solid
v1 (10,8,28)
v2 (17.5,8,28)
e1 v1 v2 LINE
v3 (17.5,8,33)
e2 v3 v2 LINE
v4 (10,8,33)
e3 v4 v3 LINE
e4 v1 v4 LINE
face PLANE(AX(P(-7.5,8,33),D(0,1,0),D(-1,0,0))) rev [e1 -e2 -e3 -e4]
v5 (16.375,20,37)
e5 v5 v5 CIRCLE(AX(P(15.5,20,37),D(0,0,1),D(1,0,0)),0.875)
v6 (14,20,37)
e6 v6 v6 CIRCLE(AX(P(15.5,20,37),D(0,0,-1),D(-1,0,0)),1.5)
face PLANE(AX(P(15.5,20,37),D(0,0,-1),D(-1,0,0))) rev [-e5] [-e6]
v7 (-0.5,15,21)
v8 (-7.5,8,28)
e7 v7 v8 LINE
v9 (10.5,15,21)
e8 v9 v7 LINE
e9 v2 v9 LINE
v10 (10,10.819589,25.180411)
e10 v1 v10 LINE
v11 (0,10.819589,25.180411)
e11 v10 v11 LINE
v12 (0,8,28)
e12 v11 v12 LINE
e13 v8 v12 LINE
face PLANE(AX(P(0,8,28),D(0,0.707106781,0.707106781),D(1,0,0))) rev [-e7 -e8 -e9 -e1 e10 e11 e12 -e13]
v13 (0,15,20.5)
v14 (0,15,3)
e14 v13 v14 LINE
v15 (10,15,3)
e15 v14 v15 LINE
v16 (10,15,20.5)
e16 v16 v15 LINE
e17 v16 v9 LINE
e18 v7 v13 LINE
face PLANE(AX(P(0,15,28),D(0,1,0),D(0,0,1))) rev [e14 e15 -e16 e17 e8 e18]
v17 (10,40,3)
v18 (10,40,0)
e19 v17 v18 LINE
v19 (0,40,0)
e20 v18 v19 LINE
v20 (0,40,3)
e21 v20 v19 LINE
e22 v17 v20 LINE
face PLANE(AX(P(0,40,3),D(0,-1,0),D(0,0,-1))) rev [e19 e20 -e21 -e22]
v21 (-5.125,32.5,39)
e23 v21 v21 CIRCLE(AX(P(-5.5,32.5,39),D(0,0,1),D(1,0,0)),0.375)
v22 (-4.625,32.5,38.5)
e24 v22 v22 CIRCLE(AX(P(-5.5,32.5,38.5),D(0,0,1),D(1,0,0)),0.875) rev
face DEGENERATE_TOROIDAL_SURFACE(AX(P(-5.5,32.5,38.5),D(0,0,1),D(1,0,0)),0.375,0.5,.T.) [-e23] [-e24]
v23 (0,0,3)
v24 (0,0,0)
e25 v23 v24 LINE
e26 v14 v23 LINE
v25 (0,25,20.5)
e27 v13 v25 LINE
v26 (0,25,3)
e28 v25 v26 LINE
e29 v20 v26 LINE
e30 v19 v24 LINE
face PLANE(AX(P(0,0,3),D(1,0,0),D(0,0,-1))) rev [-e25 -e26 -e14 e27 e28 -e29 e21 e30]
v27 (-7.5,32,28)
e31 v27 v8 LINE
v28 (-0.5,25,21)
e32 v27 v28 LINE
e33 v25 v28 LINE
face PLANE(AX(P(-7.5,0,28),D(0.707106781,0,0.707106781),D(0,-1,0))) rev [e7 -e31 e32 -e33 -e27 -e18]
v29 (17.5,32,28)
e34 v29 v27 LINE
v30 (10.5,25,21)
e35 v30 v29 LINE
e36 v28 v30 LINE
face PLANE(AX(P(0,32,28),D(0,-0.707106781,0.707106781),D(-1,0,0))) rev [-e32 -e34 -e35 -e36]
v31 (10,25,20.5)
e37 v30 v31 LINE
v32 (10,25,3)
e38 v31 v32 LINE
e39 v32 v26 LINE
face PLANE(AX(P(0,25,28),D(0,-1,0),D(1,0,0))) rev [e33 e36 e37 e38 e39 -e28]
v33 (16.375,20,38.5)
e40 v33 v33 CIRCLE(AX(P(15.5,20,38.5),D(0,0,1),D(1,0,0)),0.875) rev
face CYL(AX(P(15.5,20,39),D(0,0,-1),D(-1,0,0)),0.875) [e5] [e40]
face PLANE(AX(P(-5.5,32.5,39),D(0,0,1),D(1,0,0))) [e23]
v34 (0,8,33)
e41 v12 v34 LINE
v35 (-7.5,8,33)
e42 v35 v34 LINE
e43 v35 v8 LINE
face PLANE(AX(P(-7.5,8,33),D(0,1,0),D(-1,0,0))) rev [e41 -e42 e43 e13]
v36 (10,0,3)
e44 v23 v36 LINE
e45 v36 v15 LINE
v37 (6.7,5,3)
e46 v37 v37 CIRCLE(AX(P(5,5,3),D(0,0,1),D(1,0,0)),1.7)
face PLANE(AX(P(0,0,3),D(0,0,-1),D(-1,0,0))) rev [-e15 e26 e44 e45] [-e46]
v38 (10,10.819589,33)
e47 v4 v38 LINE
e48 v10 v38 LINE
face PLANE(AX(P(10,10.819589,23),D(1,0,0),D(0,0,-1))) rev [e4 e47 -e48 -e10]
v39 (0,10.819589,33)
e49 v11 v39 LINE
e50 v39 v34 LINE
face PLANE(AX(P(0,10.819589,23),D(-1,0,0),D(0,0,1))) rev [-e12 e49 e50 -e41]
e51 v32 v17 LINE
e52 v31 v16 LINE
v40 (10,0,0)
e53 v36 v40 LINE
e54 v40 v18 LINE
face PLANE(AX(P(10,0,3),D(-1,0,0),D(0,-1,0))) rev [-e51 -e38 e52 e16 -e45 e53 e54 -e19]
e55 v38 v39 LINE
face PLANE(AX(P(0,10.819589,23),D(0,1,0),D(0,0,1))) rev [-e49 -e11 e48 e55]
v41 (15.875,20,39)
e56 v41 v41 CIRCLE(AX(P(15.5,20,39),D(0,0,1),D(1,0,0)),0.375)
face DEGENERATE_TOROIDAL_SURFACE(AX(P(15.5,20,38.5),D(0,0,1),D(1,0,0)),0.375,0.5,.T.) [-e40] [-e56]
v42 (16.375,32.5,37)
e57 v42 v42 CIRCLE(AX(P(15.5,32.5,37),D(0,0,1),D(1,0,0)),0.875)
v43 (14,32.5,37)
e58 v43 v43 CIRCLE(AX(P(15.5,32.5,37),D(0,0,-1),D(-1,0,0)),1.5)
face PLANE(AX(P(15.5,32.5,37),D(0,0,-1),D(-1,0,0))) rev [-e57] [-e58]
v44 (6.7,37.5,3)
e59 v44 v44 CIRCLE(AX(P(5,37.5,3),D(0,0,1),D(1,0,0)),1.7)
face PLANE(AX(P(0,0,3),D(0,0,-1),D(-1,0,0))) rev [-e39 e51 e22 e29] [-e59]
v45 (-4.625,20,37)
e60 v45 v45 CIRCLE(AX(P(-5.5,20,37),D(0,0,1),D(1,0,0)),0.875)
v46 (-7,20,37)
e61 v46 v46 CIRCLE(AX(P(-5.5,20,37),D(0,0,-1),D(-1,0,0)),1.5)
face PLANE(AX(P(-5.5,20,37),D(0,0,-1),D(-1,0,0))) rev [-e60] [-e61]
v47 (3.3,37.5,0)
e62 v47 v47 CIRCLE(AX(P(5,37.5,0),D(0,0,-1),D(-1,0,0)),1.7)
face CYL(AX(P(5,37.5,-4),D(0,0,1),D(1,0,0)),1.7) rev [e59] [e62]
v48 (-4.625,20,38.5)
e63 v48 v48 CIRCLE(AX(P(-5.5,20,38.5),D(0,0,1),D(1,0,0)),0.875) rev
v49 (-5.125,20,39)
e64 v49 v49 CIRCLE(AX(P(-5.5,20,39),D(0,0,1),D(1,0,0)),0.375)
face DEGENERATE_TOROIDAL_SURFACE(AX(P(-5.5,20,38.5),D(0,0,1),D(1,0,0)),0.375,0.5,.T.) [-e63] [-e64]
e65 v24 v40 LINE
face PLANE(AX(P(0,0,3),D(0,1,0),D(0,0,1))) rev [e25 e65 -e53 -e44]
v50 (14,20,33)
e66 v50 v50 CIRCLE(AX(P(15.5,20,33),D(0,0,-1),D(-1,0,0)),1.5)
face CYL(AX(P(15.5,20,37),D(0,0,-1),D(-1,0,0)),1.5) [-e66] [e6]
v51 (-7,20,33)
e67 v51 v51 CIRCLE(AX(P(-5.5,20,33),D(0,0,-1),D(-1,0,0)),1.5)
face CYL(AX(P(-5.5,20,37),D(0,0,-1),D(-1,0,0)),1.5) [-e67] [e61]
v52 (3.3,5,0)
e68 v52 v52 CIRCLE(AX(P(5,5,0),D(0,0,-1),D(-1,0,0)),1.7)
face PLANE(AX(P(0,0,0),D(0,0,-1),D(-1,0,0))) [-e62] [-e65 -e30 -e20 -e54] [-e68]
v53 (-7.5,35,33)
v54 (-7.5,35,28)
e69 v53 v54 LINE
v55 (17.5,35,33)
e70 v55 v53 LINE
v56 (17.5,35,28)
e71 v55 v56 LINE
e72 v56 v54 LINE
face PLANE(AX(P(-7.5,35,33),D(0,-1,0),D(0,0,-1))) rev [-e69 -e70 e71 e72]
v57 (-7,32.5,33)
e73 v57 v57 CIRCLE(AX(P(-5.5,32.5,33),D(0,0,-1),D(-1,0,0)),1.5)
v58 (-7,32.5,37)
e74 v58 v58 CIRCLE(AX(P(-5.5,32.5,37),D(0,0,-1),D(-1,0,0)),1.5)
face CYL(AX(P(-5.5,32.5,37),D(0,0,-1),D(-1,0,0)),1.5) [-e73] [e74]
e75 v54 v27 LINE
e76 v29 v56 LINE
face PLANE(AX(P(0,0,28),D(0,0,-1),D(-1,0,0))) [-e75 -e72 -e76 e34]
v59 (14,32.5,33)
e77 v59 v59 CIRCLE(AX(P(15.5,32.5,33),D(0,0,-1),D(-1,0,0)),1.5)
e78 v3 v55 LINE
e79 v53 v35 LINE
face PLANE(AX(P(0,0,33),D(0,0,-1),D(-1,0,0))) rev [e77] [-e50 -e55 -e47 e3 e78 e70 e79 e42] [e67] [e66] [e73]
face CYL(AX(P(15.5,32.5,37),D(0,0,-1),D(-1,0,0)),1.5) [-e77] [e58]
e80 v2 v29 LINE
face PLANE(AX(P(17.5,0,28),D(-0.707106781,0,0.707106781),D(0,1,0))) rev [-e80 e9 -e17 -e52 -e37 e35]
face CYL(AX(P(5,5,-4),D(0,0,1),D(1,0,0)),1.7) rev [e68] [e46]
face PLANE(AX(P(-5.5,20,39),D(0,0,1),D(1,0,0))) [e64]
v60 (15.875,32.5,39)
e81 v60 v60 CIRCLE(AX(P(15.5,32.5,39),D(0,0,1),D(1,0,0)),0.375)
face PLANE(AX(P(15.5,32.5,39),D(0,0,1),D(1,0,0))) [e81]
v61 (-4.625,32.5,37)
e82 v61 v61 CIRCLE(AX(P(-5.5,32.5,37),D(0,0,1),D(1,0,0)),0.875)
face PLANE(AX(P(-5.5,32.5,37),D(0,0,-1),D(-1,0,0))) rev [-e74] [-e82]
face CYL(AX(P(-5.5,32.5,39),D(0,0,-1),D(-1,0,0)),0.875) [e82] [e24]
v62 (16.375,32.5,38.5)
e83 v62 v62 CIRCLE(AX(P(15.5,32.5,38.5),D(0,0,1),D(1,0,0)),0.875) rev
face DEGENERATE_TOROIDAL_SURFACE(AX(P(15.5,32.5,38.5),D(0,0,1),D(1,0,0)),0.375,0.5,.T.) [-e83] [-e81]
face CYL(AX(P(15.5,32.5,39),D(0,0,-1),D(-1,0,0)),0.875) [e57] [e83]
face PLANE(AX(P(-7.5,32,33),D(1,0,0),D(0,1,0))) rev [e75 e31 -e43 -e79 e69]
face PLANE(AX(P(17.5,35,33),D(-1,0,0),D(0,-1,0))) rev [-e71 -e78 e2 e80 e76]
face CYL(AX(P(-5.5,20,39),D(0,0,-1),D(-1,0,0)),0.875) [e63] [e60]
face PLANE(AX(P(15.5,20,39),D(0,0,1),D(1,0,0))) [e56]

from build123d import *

# Parameters (mm, degrees)
SKETCH1_W           = 10
SKETCH1_H           = 40
BOSS_EXTRUDE1_DEPTH = 3
SKETCH2_R           = 1.7
CUT_EXTRUDE1_DEPTH  = 7
SKETCH3_W           = 10
SKETCH3_H           = 10
BOSS_EXTRUDE2_DEPTH = 25
SKETCH7_R           = 1
BOSS_EXTRUDE3_DEPTH = 5
SKETCH9_R           = 1.5
BOSS_EXTRUDE4_DEPTH = 9
SKETCH10_R          = 0.875
BOSS_EXTRUDE5_DEPTH = 2
FILLET1_R           = 0.5
CHAMFER1_SIZE       = 7.5
CHAMFER2_SIZE       = 7
SKETCH11_W          = 10
SKETCH11_H          = 2.819588602
CUT_EXTRUDE2_DEPTH  = 10


with BuildPart() as part:
    # Sketch1 → Boss-Extrude1 (new body)
    with BuildSketch(Plane.XY):
        with Locations((5, 20)):
            Rectangle(SKETCH1_W, SKETCH1_H)
    extrude(amount=BOSS_EXTRUDE1_DEPTH)

    # Sketch2 → Cut-Extrude1 (cut)
    with BuildSketch(Plane.XY.offset(3)):
        with Locations((5, 37.5)):
            Circle(SKETCH2_R)
        with Locations((5, 5)):
            Circle(SKETCH2_R)
    extrude(amount=-CUT_EXTRUDE1_DEPTH, mode=Mode.SUBTRACT)

    # Sketch3 → Boss-Extrude2 (add)
    with BuildSketch(Plane.XY.offset(3)):
        with Locations((5, 20)):
            Rectangle(SKETCH3_W, SKETCH3_H)
    extrude(amount=BOSS_EXTRUDE2_DEPTH)

    # Sketch7 → Boss-Extrude3 (add)
    with BuildSketch(Plane.XY.offset(28)):
        Polygon((-7.5, 8), (17.5, 8), (17.5, 32), (17.5, 35), (-7.5, 35), (-7.5, 32), align=None)
        with Locations((-5.5, 20)):
            Circle(SKETCH7_R, mode=Mode.SUBTRACT)
        with Locations((15.5, 20)):
            Circle(SKETCH7_R, mode=Mode.SUBTRACT)
        with Locations((-5.5, 32.5)):
            Circle(SKETCH7_R, mode=Mode.SUBTRACT)
        with Locations((15.5, 32.5)):
            Circle(SKETCH7_R, mode=Mode.SUBTRACT)
    extrude(amount=BOSS_EXTRUDE3_DEPTH)

    # Sketch9 → Boss-Extrude4 (add)
    with BuildSketch(Plane(origin=(0, 0, 28), x_dir=(-1, 0, 0), z_dir=(0, 0, -1))):
        with Locations((5.5, 32.5)):
            Circle(SKETCH9_R)
        with Locations((-15.5, 32.5)):
            Circle(SKETCH9_R)
        with Locations((-15.5, 20)):
            Circle(SKETCH9_R)
        with Locations((5.5, 20)):
            Circle(SKETCH9_R)
    extrude(amount=-BOSS_EXTRUDE4_DEPTH)

    # Sketch10 → Boss-Extrude5 (add)
    with BuildSketch(Plane.XY.offset(37)):
        with Locations((-5.5, 32.5)):
            Circle(SKETCH10_R)
        with Locations((15.5, 32.5)):
            Circle(SKETCH10_R)
        with Locations((15.5, 20)):
            Circle(SKETCH10_R)
        with Locations((-5.5, 20)):
            Circle(SKETCH10_R)
    extrude(amount=BOSS_EXTRUDE5_DEPTH)

    # Fillet1
    fillet1_edges = [part.edges().sort_by_distance(p)[0] for p in [
        (-6.375, 20, 39),
        (14.625, 20, 39),
        (14.625, 32.5, 39),
        (-6.375, 32.5, 39),
    ]]
    fillet(fillet1_edges, radius=FILLET1_R)

    # Chamfer1
    chamfer1_edges = [part.edges().sort_by_distance(p)[0] for p in [
        (0, 20, 28),
        (10, 20, 28),
    ]]
    chamfer(chamfer1_edges, length=CHAMFER1_SIZE - 0.0001)  # a hair under: the kernel refuses the full size

    # Chamfer2
    chamfer2_edges = [part.edges().sort_by_distance(p)[0] for p in [
        (5, 15, 28),
        (5, 25, 28),
    ]]
    chamfer(chamfer2_edges, length=CHAMFER2_SIZE - 0.0001)  # a hair under: the kernel refuses the full size

    # Sketch11 → Cut-Extrude2 (cut)
    with BuildSketch(Plane.XY.offset(33)):
        with Locations((5, 9.409794301)):
            Rectangle(SKETCH11_W, SKETCH11_H)
    extrude(amount=-CUT_EXTRUDE2_DEPTH, mode=Mode.SUBTRACT)


solid = part.part
